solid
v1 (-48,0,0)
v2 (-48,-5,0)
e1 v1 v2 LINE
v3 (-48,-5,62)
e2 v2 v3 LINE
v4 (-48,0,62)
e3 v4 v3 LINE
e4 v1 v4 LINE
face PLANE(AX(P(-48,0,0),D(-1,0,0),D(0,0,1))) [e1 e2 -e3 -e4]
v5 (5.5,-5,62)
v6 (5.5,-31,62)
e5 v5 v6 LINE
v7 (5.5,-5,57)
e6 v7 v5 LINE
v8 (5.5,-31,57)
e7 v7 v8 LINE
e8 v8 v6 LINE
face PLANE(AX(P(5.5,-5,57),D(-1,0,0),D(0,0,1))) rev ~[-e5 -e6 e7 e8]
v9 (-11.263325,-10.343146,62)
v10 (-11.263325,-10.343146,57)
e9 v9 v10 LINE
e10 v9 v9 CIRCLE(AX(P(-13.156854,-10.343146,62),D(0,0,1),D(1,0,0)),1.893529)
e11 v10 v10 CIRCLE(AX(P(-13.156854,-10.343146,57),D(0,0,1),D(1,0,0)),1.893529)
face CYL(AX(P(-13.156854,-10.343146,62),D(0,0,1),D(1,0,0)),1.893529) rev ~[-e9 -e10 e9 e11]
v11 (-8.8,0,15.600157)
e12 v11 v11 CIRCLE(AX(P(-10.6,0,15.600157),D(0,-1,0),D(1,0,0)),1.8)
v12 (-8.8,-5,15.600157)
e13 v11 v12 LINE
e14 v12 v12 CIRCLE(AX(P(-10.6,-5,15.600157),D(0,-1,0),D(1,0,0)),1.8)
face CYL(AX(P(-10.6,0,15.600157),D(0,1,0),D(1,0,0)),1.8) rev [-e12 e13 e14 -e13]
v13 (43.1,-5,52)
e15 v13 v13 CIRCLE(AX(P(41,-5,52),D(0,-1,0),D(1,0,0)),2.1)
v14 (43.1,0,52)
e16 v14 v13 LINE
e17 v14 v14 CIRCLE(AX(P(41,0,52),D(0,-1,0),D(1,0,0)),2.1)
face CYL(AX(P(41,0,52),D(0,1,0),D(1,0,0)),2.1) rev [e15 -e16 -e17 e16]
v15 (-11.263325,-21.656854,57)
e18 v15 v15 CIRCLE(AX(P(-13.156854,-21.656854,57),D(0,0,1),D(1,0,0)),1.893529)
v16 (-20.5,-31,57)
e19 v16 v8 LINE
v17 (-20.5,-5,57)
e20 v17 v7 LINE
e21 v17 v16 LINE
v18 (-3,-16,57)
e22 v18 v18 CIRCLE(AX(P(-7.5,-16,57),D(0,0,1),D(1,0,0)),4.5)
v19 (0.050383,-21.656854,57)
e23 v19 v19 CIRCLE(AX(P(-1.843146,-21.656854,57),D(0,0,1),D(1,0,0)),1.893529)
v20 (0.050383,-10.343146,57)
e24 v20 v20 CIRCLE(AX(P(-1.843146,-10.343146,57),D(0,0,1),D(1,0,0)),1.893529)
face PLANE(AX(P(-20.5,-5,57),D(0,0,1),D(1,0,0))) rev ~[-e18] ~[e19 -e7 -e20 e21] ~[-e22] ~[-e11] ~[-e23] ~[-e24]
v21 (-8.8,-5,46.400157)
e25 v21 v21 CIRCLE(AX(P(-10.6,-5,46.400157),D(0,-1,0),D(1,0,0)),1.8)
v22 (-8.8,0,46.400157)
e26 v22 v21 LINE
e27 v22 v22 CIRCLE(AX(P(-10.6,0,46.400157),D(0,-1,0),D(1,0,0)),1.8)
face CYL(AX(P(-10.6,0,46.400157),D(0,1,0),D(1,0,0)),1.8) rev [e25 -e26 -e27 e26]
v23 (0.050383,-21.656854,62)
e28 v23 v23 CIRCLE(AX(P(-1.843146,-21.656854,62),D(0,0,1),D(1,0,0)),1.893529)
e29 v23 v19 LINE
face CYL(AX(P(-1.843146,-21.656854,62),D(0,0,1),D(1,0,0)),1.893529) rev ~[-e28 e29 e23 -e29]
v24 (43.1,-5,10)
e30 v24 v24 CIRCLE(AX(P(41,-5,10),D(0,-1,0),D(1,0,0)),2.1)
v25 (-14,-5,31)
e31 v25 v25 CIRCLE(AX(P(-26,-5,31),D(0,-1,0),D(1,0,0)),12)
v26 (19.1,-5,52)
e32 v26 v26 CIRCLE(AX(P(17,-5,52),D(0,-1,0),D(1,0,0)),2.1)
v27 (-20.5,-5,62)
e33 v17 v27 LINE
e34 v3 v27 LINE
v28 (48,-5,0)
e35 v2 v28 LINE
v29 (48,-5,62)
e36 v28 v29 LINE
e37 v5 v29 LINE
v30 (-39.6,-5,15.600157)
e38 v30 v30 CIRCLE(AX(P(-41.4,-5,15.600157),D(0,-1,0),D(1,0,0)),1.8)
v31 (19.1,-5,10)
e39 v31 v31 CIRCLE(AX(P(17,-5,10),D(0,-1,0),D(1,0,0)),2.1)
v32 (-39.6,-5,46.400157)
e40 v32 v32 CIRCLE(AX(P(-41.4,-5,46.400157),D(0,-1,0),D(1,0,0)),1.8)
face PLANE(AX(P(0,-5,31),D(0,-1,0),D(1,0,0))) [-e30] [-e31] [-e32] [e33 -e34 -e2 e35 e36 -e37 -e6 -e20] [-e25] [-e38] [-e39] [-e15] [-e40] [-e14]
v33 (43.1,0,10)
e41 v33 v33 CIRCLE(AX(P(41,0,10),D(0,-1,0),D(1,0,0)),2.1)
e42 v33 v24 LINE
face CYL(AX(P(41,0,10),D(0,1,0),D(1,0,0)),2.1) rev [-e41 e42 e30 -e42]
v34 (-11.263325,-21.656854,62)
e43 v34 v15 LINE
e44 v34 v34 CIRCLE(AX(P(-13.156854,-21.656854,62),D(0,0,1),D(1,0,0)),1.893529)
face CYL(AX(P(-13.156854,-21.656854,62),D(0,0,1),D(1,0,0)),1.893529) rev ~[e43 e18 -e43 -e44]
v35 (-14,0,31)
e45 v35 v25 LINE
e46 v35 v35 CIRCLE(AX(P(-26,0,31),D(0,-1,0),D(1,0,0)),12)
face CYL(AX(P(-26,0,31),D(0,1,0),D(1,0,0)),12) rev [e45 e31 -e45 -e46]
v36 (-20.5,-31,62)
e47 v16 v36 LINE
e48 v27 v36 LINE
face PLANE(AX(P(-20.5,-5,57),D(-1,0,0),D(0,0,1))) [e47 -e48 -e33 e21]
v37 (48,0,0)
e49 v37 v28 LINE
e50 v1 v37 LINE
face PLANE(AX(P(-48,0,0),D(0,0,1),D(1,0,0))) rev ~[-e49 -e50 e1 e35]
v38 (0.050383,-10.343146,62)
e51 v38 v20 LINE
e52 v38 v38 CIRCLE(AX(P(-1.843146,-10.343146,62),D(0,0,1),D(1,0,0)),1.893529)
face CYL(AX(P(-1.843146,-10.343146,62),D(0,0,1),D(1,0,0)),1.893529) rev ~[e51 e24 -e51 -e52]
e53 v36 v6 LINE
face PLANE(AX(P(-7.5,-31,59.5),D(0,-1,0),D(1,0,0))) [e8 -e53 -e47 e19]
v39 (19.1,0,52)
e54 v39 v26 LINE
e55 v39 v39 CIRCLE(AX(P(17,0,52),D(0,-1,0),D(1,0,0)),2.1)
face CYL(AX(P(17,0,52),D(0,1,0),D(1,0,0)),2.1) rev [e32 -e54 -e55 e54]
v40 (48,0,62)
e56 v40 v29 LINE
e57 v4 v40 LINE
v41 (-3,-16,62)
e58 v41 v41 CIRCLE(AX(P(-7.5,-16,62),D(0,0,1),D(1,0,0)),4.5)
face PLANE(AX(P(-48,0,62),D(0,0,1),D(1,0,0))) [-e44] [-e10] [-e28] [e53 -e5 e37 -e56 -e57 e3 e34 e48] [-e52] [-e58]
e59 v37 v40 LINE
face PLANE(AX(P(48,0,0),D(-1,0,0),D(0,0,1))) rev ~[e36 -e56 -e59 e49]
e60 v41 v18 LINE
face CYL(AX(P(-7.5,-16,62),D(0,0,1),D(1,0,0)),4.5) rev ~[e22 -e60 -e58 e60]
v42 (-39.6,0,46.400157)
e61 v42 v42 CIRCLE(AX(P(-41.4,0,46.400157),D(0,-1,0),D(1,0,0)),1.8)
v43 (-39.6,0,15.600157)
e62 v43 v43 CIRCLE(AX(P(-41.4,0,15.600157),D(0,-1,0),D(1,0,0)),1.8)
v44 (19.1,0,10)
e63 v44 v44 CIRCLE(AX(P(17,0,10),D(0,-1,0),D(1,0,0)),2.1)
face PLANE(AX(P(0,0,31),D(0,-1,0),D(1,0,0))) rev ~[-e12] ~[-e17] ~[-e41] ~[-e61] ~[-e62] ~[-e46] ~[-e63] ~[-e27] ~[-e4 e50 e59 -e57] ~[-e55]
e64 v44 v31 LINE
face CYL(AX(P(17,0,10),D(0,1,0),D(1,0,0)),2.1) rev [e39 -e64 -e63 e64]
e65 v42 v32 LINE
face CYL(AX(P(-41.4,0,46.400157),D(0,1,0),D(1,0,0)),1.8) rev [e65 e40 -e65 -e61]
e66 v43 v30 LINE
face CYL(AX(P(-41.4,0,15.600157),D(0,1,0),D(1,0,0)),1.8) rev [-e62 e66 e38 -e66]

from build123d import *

# Parameters (mm, degrees)
F0_W     = 96
F0_H     = 62
F0_R     = 1.8
F0_R_2   = 2.1
F0_R_3   = 12
F1_DEPTH = 5
F2_W     = 26
F2_H     = 5
F3_DEPTH = 26
F4_R     = 4.5
F4_R_2   = 1.8935291465
F5_DEPTH = 25


# Not quite as in the source:
# - a feature names something its author has since deleted; it is built from what else it names


with BuildPart() as f1:
    # F0 (on Front) → F1 (new body)
    with BuildSketch(Plane.XZ):
        with Locations((0, 31)):
            Rectangle(F0_W, F0_H)
        with Locations((-41.4, 15.6001571745)):
            Circle(F0_R, mode=Mode.SUBTRACT)
        with Locations((-10.6, 15.6001571745)):
            Circle(F0_R, mode=Mode.SUBTRACT)
        with Locations((17, 10)):
            Circle(F0_R_2, mode=Mode.SUBTRACT)
        with Locations((41, 10)):
            Circle(F0_R_2, mode=Mode.SUBTRACT)
        with Locations((-26, 31)):
            Circle(F0_R_3, mode=Mode.SUBTRACT)
        with Locations((-41.4, 46.4001571745)):
            Circle(F0_R, mode=Mode.SUBTRACT)
        with Locations((-10.6, 46.4001571745)):
            Circle(F0_R, mode=Mode.SUBTRACT)
        with Locations((17, 52)):
            Circle(F0_R_2, mode=Mode.SUBTRACT)
        with Locations((41, 52)):
            Circle(F0_R_2, mode=Mode.SUBTRACT)
    extrude(amount=F1_DEPTH)

    # F2 (on face) → F3 (join)
    with BuildSketch(Plane.XZ.offset(5)):
        with Locations((-7.5, 59.5)):
            Rectangle(F2_W, F2_H)
    extrude(amount=F3_DEPTH)

    # F4 (on face) → F5 (cut)
    with BuildSketch(Plane.XY.offset(62)):
        with Locations((-7.5, -16)):
            Circle(F4_R)
        with Locations((-13.1568542495, -10.3431457505)):
            Circle(F4_R_2)
        with Locations((-1.8431457505, -10.3431457505)):
            Circle(F4_R_2)
        with Locations((-1.8431457505, -21.6568542495)):
            Circle(F4_R_2)
        with Locations((-13.1568542495, -21.6568542495)):
            Circle(F4_R_2)
    extrude(amount=-F5_DEPTH, mode=Mode.SUBTRACT)


solid = f1.part
